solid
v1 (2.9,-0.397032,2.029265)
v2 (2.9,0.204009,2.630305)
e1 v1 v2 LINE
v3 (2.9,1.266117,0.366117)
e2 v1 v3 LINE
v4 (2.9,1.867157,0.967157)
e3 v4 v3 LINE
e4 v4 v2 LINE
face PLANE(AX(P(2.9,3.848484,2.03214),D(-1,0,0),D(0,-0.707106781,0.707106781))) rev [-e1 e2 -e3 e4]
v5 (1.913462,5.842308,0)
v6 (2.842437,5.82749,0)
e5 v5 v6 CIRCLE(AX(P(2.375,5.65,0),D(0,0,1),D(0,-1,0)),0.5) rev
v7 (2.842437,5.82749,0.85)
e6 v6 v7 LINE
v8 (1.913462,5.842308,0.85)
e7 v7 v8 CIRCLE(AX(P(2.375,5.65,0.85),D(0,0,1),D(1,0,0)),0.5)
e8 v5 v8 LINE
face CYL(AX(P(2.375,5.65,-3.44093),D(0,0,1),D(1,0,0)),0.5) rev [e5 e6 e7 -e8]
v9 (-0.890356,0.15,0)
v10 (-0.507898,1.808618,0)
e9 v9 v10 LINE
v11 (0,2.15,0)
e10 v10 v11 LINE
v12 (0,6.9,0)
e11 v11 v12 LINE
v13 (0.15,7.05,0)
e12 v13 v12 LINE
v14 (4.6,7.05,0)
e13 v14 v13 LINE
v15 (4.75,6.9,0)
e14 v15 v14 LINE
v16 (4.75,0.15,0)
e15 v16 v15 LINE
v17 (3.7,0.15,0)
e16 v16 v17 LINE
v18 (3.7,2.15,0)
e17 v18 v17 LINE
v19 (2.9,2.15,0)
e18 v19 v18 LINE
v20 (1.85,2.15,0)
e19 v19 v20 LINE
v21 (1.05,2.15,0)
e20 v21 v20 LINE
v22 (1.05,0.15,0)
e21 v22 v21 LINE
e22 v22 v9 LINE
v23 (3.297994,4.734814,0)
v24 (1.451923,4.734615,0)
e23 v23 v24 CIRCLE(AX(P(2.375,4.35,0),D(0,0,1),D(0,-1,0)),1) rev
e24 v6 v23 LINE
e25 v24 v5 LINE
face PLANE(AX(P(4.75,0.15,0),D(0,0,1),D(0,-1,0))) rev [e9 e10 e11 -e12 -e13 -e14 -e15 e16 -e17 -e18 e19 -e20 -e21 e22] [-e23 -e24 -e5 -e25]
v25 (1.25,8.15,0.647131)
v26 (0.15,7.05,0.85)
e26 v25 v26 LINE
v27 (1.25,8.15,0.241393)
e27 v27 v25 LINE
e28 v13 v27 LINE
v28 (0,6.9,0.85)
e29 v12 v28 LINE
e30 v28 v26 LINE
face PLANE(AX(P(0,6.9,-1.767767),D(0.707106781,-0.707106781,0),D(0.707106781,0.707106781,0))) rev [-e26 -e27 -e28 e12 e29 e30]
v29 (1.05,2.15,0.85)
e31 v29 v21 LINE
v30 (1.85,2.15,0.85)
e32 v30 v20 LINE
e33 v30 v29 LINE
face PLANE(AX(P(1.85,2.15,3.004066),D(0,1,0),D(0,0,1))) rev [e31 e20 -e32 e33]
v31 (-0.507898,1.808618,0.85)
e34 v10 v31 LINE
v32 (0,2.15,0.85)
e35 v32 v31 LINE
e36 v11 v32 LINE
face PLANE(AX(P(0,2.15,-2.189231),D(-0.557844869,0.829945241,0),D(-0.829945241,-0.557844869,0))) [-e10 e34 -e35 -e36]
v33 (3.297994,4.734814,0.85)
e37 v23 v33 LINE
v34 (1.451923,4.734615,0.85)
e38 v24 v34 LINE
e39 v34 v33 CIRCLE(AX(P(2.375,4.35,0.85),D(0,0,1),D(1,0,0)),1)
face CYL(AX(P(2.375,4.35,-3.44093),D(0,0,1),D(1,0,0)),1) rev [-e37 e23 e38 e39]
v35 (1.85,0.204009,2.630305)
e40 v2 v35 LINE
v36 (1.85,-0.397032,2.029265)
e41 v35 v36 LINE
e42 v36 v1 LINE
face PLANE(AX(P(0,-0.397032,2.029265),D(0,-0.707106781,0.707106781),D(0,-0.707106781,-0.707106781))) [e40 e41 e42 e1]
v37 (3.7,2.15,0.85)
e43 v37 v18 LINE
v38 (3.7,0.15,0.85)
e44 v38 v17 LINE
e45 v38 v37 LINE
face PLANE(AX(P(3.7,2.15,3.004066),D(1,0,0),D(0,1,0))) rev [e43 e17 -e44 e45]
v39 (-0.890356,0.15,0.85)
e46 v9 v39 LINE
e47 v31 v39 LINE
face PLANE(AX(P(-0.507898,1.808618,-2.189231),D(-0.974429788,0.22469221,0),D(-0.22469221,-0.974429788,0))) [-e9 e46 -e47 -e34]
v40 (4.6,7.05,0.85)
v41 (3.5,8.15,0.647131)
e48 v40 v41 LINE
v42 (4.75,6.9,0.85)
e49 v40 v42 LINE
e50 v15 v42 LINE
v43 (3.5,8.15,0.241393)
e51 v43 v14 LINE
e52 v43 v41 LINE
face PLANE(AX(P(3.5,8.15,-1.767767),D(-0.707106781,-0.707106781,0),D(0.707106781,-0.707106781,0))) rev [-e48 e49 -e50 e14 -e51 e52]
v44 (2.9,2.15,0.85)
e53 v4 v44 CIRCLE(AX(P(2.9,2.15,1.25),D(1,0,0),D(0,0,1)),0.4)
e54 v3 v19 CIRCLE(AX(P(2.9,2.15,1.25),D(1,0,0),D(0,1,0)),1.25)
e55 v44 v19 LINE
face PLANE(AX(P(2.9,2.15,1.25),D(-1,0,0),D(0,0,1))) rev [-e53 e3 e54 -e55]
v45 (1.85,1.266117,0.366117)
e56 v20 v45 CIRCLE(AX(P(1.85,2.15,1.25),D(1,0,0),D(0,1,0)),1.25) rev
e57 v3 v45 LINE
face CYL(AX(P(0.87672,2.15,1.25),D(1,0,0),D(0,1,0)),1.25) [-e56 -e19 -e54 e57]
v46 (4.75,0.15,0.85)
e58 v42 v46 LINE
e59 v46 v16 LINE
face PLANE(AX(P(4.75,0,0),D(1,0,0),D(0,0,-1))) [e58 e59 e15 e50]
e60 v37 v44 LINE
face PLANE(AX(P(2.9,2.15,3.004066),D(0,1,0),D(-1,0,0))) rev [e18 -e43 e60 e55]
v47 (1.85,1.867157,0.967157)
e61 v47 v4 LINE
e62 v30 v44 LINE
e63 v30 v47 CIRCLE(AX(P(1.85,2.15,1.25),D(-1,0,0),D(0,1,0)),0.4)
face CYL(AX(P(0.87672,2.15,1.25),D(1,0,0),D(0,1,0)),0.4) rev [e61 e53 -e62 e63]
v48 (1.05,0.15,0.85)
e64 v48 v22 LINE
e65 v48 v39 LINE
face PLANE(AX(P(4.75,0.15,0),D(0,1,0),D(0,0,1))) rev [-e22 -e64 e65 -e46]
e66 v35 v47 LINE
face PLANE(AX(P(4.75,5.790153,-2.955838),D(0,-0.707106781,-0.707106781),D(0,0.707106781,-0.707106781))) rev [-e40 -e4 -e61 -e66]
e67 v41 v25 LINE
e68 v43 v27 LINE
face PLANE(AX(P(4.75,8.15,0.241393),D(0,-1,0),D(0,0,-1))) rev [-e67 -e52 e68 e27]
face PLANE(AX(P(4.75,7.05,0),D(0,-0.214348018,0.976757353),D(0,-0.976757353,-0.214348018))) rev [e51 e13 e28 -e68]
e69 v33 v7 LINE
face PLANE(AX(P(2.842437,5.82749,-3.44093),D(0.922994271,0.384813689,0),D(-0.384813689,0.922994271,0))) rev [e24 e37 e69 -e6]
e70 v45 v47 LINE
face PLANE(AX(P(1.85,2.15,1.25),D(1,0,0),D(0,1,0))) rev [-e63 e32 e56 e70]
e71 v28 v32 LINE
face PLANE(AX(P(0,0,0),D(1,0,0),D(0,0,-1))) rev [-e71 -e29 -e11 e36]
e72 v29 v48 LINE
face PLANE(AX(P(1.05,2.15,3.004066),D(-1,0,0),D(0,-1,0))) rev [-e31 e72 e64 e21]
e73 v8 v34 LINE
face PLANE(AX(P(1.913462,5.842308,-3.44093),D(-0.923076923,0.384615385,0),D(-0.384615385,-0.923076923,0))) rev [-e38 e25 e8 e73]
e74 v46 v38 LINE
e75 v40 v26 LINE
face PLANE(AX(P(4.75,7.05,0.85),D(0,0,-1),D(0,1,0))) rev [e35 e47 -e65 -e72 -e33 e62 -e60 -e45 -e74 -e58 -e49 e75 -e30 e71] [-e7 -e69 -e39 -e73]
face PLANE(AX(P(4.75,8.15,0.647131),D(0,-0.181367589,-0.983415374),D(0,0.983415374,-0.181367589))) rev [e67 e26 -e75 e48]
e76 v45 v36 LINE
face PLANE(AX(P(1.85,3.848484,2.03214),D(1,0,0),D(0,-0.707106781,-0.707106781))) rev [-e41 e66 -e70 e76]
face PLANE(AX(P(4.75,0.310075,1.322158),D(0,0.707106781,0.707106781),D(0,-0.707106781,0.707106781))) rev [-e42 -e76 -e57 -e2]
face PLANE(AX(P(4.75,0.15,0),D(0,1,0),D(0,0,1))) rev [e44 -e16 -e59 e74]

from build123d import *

# Parameters (mm, degrees)
BOSS_EXTRUDE1_DEPTH    = 4.75
CUT_EXTRUDE1_REACH     = 11.471
CUT_EXTRUDE2_DEPTH     = 0.85
SKETCH6_W              = 0.8
SKETCH6_H              = 2
CUT_EXTRUDE3_DEPTH     = 0.85
SKETCH7_W              = 1.05
SKETCH7_H              = 0.85
BOSS_EXTRUDE2_DEPTH    = 1
SKETCHED_START         = 1.85
SKETCHED_BEND1_DEPTH   = 1.05
SKETCHED_BEND1_2_DEPTH = 1.05
BOSS_EXTRUDE3_DEPTH    = 0.85


# Read off the part's stored shape, not the designer's step: Sketched Bend1
with BuildPart() as part:
    # Sketch1 → Boss-Extrude1 (new body)
    with BuildSketch(Plane(origin=(0, 0, 0), x_dir=(0, 0, -1), z_dir=(1, 0, 0))):
        Polygon((0, 0.15), (0, 7.05), (-0.241393443, 8.15), (-0.647131148, 8.15), (-0.85, 7.05), (-0.85, 0.15), align=None)
    extrude(amount=BOSS_EXTRUDE1_DEPTH)

    # Cut-Extrude1: up to this face of the body (flat: up to its plane)
    cut_extrude1_end = Plane(part.part.faces().sort_by_distance((2.375, 3.6, 0))[0])
    # Sketch4 → Cut-Extrude1 (cut, up to the picked face)
    with BuildSketch(Plane.XY.offset(0.85), mode=Mode.PRIVATE) as cut_extrude1_sk1:
        Polygon((0, 6.9), (1.25, 8.15), (0, 8.15), align=None)
    cut_extrude1_tool1 = split(extrude(cut_extrude1_sk1.sketch, amount=-CUT_EXTRUDE1_REACH, mode=Mode.PRIVATE), bisect_by=cut_extrude1_end, keep=Keep.BOTH, mode=Mode.PRIVATE)
    # Sketch4 → Cut-Extrude1 (cut, up to the picked face)
    with BuildSketch(Plane.XY.offset(0.85), mode=Mode.PRIVATE) as cut_extrude1_sk2:
        Polygon((3.5, 8.15), (4.75, 6.9), (4.75, 8.15), align=None)
    cut_extrude1_tool2 = split(extrude(cut_extrude1_sk2.sketch, amount=-CUT_EXTRUDE1_REACH, mode=Mode.PRIVATE), bisect_by=cut_extrude1_end, keep=Keep.BOTH, mode=Mode.PRIVATE)
    add(cut_extrude1_tool1.solids().sort_by(Axis((0.416667, 7.733333, 0.85), (0, 0, -1)))[0], mode=Mode.SUBTRACT)
    add(cut_extrude1_tool2.solids().sort_by(Axis((4.333333, 7.733333, 0.85), (0, 0, -1)))[0], mode=Mode.SUBTRACT)

    # Sketch5 → Cut-Extrude2 (cut)
    with BuildSketch(Plane.XY.offset(0.85)):
        with BuildLine():
            Line((1.913461538, 5.842307692), (1.451923077, 4.734615385))
            ThreePointArc((1.451923077, 4.734615385), (2.37510742, 3.350000006), (3.297994271, 4.734813689))
            Line((3.297994271, 4.734813689), (2.842436975, 5.827489929))
            ThreePointArc((2.842436975, 5.827489929), (2.382974312, 6.149936406), (1.913461538, 5.842307692))
        make_face()
    extrude(amount=-CUT_EXTRUDE2_DEPTH, mode=Mode.SUBTRACT)

    # Sketch6 → Cut-Extrude3 (cut)
    with BuildSketch(Plane(origin=(0, 0, 0), x_dir=(-1, 0, 0), z_dir=(0, 0, -1))):
        with Locations((-3.3, 1.15)):
            Rectangle(SKETCH6_W, SKETCH6_H)
        with Locations((-1.45, 1.15)):
            Rectangle(SKETCH6_W, SKETCH6_H)
    extrude(amount=-CUT_EXTRUDE3_DEPTH, mode=Mode.SUBTRACT)

    # Sketch7 → Boss-Extrude2 (add)
    with BuildSketch(Plane.XZ.offset(-0.15)):
        with Locations((2.375, 0.425)):
            Rectangle(SKETCH7_W, SKETCH7_H)
    extrude(amount=BOSS_EXTRUDE2_DEPTH)

    # Sketched Bend1 outline → Sketched Bend1 (cut)
    with BuildSketch(Plane.YZ.offset(SKETCHED_START)):
        with BuildLine():
            Line((1.266116524, 0.366116524), (0.782233048, 0.85))
            Line((0.782233048, 0.85), (-0.85, 0.85))
            Line((-0.85, 0.85), (-0.85, 0))
            Line((-0.85, 0), (2.15, 0))
            ThreePointArc((2.15, 0), (1.67164571, 0.095150584), (1.266116524, 0.366116524))
        make_face()
    extrude(amount=SKETCHED_BEND1_DEPTH, mode=Mode.SUBTRACT)

    # Sketched Bend1 2 outline → Sketched Bend1 2 (add)
    with BuildSketch(Plane.YZ.offset(SKETCHED_START)):
        with BuildLine():
            ThreePointArc((2.15, 0.85), (1.996926627, 0.880448187), (1.867157288, 0.967157288))
            Line((1.867157288, 0.967157288), (0.204009247, 2.630305328))
            Line((0.204009247, 2.630305328), (-0.397031517, 2.029264564))
            Line((-0.397031517, 2.029264564), (0.782233048, 0.85))
            Line((0.782233048, 0.85), (2.15, 0.85))
        make_face()
    extrude(amount=SKETCHED_BEND1_2_DEPTH)

    # Sketch15 → Boss-Extrude3 (add)
    with BuildSketch(Plane.XY.offset(0.85)):
        Polygon((0, 2.15), (-0.50789834, 1.808617859), (-0.890356386, 0.15), (0, 0.15), align=None)
    extrude(amount=-BOSS_EXTRUDE3_DEPTH)


solid = part.part
